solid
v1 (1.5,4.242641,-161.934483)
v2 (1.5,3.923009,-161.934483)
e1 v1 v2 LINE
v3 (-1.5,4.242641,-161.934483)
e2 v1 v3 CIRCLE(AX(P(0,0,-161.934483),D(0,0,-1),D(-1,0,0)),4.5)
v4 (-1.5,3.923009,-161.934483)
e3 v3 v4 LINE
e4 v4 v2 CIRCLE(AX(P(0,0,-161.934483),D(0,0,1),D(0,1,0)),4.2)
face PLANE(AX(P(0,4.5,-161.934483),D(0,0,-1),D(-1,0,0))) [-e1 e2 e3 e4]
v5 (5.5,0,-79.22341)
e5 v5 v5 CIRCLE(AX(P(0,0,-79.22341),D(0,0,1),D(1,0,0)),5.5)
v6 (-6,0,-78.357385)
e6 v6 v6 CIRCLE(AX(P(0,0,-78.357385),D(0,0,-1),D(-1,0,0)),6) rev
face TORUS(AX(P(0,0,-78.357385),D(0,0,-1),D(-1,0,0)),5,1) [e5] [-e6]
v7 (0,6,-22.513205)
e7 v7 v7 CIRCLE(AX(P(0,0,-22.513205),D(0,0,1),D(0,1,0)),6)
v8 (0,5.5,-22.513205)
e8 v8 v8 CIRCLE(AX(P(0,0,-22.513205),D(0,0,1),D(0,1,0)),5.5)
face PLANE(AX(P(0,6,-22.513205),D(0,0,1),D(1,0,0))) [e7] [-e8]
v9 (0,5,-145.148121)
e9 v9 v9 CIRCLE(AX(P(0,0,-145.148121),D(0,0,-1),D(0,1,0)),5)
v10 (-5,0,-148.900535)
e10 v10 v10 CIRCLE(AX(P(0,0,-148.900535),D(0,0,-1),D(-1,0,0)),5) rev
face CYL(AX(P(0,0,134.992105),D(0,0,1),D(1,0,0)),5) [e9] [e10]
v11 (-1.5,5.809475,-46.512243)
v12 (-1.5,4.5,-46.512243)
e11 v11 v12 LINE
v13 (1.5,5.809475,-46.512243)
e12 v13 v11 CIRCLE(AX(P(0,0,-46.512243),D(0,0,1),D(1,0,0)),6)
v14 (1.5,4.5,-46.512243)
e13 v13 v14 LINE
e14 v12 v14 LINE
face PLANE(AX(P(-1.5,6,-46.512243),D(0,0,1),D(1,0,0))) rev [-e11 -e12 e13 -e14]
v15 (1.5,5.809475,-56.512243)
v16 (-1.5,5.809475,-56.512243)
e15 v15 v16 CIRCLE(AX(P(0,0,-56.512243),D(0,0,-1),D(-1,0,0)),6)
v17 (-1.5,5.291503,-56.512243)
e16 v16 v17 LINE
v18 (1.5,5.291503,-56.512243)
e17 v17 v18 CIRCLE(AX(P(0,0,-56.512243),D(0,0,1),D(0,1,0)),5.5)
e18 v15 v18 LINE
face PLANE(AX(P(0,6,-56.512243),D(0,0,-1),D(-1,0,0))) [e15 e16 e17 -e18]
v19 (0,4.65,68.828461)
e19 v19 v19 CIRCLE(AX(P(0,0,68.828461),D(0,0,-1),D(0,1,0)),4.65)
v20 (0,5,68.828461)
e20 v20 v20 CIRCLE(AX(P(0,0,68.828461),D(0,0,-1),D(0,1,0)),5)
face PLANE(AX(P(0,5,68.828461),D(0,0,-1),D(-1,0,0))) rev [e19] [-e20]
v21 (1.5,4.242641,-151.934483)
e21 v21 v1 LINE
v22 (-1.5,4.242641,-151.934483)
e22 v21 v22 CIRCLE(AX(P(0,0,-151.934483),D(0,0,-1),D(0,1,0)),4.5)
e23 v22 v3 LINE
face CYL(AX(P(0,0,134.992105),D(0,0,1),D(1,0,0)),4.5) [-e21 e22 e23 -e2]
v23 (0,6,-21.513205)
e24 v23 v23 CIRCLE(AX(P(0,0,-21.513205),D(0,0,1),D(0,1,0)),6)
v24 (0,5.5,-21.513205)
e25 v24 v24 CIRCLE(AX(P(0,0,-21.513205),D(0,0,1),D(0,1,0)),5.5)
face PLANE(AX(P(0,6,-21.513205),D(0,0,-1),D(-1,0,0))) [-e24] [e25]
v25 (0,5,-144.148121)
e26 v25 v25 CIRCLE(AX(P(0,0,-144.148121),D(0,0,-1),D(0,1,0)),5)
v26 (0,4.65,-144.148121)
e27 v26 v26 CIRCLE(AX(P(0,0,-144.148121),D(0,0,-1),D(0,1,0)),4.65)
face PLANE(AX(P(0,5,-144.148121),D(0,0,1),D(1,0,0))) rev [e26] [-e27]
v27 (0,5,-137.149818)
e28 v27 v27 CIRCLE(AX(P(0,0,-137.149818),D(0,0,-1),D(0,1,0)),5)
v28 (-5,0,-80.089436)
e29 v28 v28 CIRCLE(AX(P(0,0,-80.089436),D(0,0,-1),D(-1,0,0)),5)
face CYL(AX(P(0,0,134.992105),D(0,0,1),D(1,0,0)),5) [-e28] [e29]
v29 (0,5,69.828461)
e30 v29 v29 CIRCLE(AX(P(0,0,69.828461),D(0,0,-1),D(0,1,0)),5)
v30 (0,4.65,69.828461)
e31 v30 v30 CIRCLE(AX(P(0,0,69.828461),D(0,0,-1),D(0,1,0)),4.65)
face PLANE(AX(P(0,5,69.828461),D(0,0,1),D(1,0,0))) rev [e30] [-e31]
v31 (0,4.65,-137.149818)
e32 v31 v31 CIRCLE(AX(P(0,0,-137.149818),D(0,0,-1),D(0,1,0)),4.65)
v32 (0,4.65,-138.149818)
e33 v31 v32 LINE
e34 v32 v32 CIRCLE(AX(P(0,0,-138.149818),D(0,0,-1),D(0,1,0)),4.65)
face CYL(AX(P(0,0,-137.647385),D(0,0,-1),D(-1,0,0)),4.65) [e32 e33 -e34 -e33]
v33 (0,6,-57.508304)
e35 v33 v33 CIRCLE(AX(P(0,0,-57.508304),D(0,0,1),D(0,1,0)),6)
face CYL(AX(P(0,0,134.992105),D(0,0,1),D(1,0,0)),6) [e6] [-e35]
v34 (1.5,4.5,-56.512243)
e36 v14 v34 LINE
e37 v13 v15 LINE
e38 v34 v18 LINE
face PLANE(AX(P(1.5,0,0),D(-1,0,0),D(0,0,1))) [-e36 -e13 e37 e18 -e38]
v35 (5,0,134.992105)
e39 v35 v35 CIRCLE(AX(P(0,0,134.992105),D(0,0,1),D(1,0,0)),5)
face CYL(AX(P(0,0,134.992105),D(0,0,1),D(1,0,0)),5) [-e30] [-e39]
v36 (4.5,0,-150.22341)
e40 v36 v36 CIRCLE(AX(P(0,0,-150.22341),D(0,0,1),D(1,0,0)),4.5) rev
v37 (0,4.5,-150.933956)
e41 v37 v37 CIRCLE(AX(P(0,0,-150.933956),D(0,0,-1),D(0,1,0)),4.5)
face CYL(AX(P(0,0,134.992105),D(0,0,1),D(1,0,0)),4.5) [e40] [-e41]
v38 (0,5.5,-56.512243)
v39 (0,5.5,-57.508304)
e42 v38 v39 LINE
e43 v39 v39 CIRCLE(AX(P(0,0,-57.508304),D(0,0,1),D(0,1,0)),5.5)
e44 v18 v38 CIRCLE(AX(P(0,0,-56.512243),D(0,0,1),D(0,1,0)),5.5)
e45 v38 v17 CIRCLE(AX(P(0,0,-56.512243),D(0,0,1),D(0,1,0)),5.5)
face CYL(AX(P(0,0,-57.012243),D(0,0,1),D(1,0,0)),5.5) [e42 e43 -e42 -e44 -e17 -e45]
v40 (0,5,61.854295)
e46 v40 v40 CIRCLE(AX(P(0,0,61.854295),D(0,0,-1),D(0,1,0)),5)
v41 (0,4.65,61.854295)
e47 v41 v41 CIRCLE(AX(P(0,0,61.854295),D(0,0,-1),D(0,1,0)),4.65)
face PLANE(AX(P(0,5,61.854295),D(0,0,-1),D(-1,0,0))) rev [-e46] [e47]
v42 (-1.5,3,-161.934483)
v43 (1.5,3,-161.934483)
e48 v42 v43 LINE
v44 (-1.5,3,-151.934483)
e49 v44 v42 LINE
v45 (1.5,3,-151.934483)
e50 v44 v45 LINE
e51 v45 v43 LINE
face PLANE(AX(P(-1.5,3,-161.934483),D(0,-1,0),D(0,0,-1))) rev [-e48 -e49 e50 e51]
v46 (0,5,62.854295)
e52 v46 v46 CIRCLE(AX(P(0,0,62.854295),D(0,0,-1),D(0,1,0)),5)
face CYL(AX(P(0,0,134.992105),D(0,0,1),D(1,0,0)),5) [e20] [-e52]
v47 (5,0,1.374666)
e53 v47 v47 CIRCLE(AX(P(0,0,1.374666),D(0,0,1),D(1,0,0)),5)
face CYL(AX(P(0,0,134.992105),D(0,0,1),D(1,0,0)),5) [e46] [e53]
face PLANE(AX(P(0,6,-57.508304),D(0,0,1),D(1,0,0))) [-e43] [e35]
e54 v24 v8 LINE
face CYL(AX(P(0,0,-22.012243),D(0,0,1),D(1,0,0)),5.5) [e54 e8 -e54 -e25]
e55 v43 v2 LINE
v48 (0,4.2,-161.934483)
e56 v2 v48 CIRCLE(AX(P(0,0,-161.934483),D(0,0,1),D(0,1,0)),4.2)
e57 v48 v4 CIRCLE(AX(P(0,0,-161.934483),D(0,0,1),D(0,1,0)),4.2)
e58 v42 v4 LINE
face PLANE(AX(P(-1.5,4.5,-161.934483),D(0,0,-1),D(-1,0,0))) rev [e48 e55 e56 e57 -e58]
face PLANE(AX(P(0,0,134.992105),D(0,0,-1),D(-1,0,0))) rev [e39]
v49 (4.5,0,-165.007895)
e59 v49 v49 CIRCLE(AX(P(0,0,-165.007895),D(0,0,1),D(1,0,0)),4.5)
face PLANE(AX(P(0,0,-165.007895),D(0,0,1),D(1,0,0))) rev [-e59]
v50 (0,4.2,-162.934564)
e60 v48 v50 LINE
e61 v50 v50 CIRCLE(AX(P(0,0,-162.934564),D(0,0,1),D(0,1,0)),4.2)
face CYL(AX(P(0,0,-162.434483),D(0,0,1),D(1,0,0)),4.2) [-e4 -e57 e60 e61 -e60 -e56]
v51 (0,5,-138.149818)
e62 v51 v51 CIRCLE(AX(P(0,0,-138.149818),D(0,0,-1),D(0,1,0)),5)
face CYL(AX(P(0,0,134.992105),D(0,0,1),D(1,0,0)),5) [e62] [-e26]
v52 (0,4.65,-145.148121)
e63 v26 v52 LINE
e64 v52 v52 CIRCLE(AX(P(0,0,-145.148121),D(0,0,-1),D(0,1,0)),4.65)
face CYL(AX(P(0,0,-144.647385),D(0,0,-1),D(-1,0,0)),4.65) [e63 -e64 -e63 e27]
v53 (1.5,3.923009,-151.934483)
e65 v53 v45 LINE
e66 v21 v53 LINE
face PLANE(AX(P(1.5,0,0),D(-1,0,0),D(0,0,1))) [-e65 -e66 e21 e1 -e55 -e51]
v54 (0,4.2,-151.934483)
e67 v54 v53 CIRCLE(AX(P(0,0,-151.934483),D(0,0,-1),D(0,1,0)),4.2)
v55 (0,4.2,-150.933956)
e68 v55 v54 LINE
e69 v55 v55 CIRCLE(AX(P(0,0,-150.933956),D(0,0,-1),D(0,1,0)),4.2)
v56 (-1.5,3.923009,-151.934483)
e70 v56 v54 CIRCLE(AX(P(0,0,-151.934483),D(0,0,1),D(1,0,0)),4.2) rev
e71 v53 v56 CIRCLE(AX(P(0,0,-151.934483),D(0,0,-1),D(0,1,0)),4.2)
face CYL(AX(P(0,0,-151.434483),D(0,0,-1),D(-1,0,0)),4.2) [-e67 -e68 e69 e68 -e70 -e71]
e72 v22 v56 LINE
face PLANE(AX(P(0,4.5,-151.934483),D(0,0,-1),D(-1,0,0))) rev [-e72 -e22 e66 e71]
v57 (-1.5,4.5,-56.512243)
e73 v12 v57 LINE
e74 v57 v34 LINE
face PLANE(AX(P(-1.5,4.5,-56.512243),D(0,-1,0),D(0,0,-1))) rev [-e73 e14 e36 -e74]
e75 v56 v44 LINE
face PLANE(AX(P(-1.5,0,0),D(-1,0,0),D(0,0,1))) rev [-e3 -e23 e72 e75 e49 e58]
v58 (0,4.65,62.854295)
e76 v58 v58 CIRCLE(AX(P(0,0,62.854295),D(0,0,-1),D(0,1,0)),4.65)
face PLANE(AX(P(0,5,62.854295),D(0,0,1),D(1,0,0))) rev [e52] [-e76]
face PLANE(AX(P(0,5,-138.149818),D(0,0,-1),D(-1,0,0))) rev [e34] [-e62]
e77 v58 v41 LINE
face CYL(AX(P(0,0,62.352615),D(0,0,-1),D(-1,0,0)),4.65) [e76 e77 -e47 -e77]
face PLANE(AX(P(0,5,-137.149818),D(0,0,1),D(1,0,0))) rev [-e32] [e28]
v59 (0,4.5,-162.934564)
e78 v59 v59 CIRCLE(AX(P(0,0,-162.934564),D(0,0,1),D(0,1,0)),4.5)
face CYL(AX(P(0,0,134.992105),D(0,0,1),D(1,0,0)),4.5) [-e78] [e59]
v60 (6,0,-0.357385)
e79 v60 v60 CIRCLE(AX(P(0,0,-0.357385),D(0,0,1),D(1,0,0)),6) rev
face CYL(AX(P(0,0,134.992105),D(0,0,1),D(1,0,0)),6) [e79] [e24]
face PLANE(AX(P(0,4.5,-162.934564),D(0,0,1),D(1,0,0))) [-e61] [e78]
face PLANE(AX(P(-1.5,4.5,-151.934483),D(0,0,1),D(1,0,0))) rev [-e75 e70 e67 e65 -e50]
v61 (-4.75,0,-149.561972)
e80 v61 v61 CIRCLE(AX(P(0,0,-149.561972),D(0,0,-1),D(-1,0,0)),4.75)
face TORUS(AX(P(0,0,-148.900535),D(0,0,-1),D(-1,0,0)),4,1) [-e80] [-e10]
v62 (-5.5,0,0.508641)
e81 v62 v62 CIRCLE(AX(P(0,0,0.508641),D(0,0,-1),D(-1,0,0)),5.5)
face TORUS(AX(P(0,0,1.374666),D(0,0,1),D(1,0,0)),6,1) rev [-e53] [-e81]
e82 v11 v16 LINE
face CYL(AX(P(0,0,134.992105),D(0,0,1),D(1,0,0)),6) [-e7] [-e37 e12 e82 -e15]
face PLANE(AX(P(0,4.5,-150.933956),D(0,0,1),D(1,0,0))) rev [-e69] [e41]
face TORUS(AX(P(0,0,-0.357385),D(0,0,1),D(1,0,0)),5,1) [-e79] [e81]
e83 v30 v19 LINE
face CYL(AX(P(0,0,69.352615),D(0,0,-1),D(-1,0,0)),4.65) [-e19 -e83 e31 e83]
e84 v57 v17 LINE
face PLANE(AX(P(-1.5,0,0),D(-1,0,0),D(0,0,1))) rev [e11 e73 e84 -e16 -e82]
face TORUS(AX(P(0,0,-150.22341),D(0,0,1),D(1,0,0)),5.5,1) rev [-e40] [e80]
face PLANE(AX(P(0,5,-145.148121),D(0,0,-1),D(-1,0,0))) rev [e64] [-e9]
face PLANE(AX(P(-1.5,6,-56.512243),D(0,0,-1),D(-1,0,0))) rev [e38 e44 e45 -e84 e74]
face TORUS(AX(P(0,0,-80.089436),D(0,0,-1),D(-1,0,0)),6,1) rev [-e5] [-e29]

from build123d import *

# Parameters (mm, degrees)
SKETCH7_W           = 10
SKETCH7_H           = 1.5
CUT_EXTRUDE4_DEPTH  = 1.5
SKETCH8_W           = 10
SKETCH8_H           = 1.5
CUT_EXTRUDE5_DEPTH  = 1.5
SKETCH11_W          = 1
SKETCH11_H          = 0.35
SKETCH12_W          = 1
SKETCH12_H          = 0.35
SKETCH14_R          = 6
BOSS_EXTRUDE1_DEPTH = 20
BOSS_EXTRUDE2_START = 20
SKETCH15_R          = 6
BOSS_EXTRUDE2_DEPTH = 20
SKETCH18_W          = 1
SKETCH18_H          = 0.35
SKETCH19_W          = 1
SKETCH19_H          = 0.35
SKETCH22_W          = 0.996061345
SKETCH22_H          = 0.5
SKETCH26_W          = 1.000081644
SKETCH26_H          = 0.3
SKETCH27_W          = 1.000526486
SKETCH27_H          = 0.3
SKETCH29_W          = 1
SKETCH29_H          = 0.5
FILLET2_R           = 1
FILLET3_R           = 1
FILLET4_R           = 1
FILLET5_R           = 1
FILLET6_R           = 1
FILLET7_R           = 1


# Some blends are built 0.0001 mm under size
with BuildPart() as part:
    # Sketch1 → Revolve1 (revolve)
    with BuildSketch(Plane(origin=(0, 0, 0), x_dir=(0, 0, -1), z_dir=(1, 0, 0)), mode=Mode.PRIVATE) as revolve1_sk:
        Polygon((-134.992104591, 0), (165.007895409, 0), (165.007895409, 4.5), (149.357384883, 4.5), (149.357384883, 5), (59.357384883, 5), (59.357384883, 6), (19.357384883, 6), (19.357384883, 5), (-134.992104591, 5), align=None)
    revolve(revolve1_sk.sketch.rotate(Axis((0, 0, 134.992104591), (0, 0, -1)), 90), axis=Axis((0, 0, 134.992104591), (0, 0, -1)))

    # Sketch7 → Cut-Extrude4 (cut, symmetric)
    with BuildSketch(Plane(origin=(0, 0, 0), x_dir=(0, 0, -1), z_dir=(1, 0, 0))):
        with Locations((51.512242661, 5.25)):
            Rectangle(SKETCH7_W, SKETCH7_H)
    extrude(amount=CUT_EXTRUDE4_DEPTH, both=True, mode=Mode.SUBTRACT)

    # Sketch8 → Cut-Extrude5 (cut, symmetric)
    with BuildSketch(Plane(origin=(0, 0, 0), x_dir=(0, 0, -1), z_dir=(1, 0, 0))):
        with Locations((156.934482796, 3.75)):
            Rectangle(SKETCH8_W, SKETCH8_H)
    extrude(amount=CUT_EXTRUDE5_DEPTH, both=True, mode=Mode.SUBTRACT)

    # Cut-Sweep1: sweep along a path in Sketch10
    with BuildLine(Plane(origin=(0, 0, -137.647384883), x_dir=(-1, 0, 0), z_dir=(0, 0, -1))) as cut_sweep1_path:
        CenterArc((0, 0), 5, 0, 360)
    # Sketch11 → Cut-Sweep1 (sweep, cut)
    with BuildSketch(Plane(origin=(0, 0, 0), x_dir=(0, 0, -1), z_dir=(1, 0, 0))):
        with Locations((137.649818054, 4.825)):
            Rectangle(SKETCH11_W, SKETCH11_H)
    sweep(path=cut_sweep1_path.line, mode=Mode.SUBTRACT)

    # Cut-Sweep2: sweep along a path in Sketch9
    with BuildLine(Plane(origin=(0, 0, -144.647384883), x_dir=(-1, 0, 0), z_dir=(0, 0, -1))) as cut_sweep2_path:
        CenterArc((0, 0), 5, 0, 360)
    # Sketch12 → Cut-Sweep2 (sweep, cut)
    with BuildSketch(Plane(origin=(0, 0, 0), x_dir=(0, 0, -1), z_dir=(1, 0, 0))):
        with Locations((144.648120844, 4.825)):
            Rectangle(SKETCH12_W, SKETCH12_H)
    sweep(path=cut_sweep2_path.line, mode=Mode.SUBTRACT)

    # Sketch14 → Boss-Extrude1 (add)
    with BuildSketch(Plane(origin=(0, 0, -59.357384883), x_dir=(-1, 0, 0), z_dir=(0, 0, -1))):
        with Locations(Location((0, 0, 0), (0, 0, 180))):
            Circle(SKETCH14_R)
    extrude(amount=BOSS_EXTRUDE1_DEPTH)

    # Sketch15 → Boss-Extrude2 (add)
    with BuildSketch(Plane.XY.offset(-19.357384883).offset(BOSS_EXTRUDE2_START)):
        Circle(SKETCH15_R)
    extrude(amount=-BOSS_EXTRUDE2_DEPTH)

    # Cut-Sweep3: sweep along a path in Sketch16
    with BuildLine(Plane(origin=(0, 0, 62.352615117), x_dir=(-1, 0, 0), z_dir=(0, 0, -1))) as cut_sweep3_path:
        CenterArc((0, 0), 5, 0, 360)
    # Sketch18 → Cut-Sweep3 (sweep, cut)
    with BuildSketch(Plane(origin=(0, 0, 0), x_dir=(0, 0, -1), z_dir=(1, 0, 0))):
        with Locations((-62.354294527, 4.825)):
            Rectangle(SKETCH18_W, SKETCH18_H)
    sweep(path=cut_sweep3_path.line, mode=Mode.SUBTRACT)

    # Cut-Sweep4: sweep along a path in Sketch17
    with BuildLine(Plane(origin=(0, 0, 69.352615117), x_dir=(-1, 0, 0), z_dir=(0, 0, -1))) as cut_sweep4_path:
        CenterArc((0, 0), 5, 0, 360)
    # Sketch19 → Cut-Sweep4 (sweep, cut)
    with BuildSketch(Plane(origin=(0, 0, 0), x_dir=(0, 0, -1), z_dir=(1, 0, 0))):
        with Locations((-69.328460844, 4.825)):
            Rectangle(SKETCH19_W, SKETCH19_H)
    sweep(path=cut_sweep4_path.line, mode=Mode.SUBTRACT)

    # Cut-Sweep5: sweep along a path in Sketch20
    with BuildLine(Plane.XY.offset(-57.012242661)) as cut_sweep5_path:
        CenterArc((0, 0), 6, 0, 360)
    # Sketch22 → Cut-Sweep5 (sweep, cut)
    with BuildSketch(Plane(origin=(0, 0, 0), x_dir=(0, 0, -1), z_dir=(1, 0, 0))):
        with Locations((57.010273334, 5.75)):
            Rectangle(SKETCH22_W, SKETCH22_H)
    sweep(path=cut_sweep5_path.line, mode=Mode.SUBTRACT)

    # Cut-Sweep7: sweep along a path in Sketch24
    with BuildLine(Plane.XY.offset(-162.434482796)) as cut_sweep7_path:
        CenterArc((0, 0), 4.5, 0, 360)
    # Sketch26 → Cut-Sweep7 (sweep, cut)
    with BuildSketch(Plane(origin=(0, 0, 0), x_dir=(0, 0, -1), z_dir=(1, 0, 0))):
        with Locations((162.434523618, 4.35)):
            Rectangle(SKETCH26_W, SKETCH26_H)
    sweep(path=cut_sweep7_path.line, mode=Mode.SUBTRACT)

    # Cut-Sweep8: sweep along a path in Sketch25
    with BuildLine(Plane(origin=(0, 0, -151.434482796), x_dir=(-1, 0, 0), z_dir=(0, 0, -1))) as cut_sweep8_path:
        CenterArc((0, 0), 4.5, 0, 360)
    # Sketch27 → Cut-Sweep8 (sweep, cut)
    with BuildSketch(Plane(origin=(0, 0, 0), x_dir=(0, 0, -1), z_dir=(1, 0, 0))):
        with Locations((151.434219553, 4.35)):
            Rectangle(SKETCH27_W, SKETCH27_H)
    sweep(path=cut_sweep8_path.line, mode=Mode.SUBTRACT)

    # Cut-Sweep9: sweep along a path in Sketch28
    with BuildLine(Plane.XY.offset(-22.012242661)) as cut_sweep9_path:
        CenterArc((0, 0), 6, 0, 360)
    # Sketch29 → Cut-Sweep9 (sweep, cut)
    with BuildSketch(Plane(origin=(0, 0, 0), x_dir=(0, 0, -1), z_dir=(1, 0, 0))):
        with Locations((22.013204975, 5.75)):
            Rectangle(SKETCH29_W, SKETCH29_H)
    sweep(path=cut_sweep9_path.line, mode=Mode.SUBTRACT)

    # Fillet2
    # the kernel refuses this fillet: 1 mm, written as the material it adds along each edge
    with BuildSketch(Plane(origin=(0, 0, -149.357384883), x_dir=(1, 0, 0), z_dir=(0, 1, 0))) as fillet2_piece_1:
        with BuildLine():
            CenterArc((5.5, 0.866025404), FILLET2_R, 180, 60)
            Line((5, 0), (4.99, -0.017320508))
            ThreePointArc((4.99, -0.017320508), (4.75, -0.02), (4.5, -0.02))
            Line((4.5, -0.02), (4.48, 0))
            Line((4.48, 0), (4.48, 0.866025404))
            Line((4.48, 0.866025404), (4.5, 0.866025404))
        make_face()
    revolve(axis=Axis((0, 0, -149.357384883), (0, 0, -1)))

    # Fillet3
    fillet3_edges = [part.edges().sort_by_distance(p)[0] for p in [
        (-5, 0, -149.357384883),
    ]]
    fillet(fillet3_edges, radius=FILLET3_R)

    # Fillet4
    fillet4_edges = [part.edges().sort_by_distance(p)[0] for p in [
        (-6, 0, -79.357384883),
    ]]
    fillet(fillet4_edges, radius=FILLET4_R - 0.0001)  # a hair under: the kernel refuses the full size

    # Fillet5
    fillet5_edges = [part.edges().sort_by_distance(p)[0] for p in [
        (-5, 0, -79.357384883),
    ]]
    fillet(fillet5_edges, radius=FILLET5_R)

    # Fillet6
    fillet6_edges = [part.edges().sort_by_distance(p)[0] for p in [
        (-6, 0, 0.642615117),
    ]]
    fillet(fillet6_edges, radius=FILLET6_R - 0.0001)  # a hair under: the kernel refuses the full size

    # Fillet7
    fillet7_edges = [part.edges().sort_by_distance(p)[0] for p in [
        (-5, 0, 0.642615117),
    ]]
    fillet(fillet7_edges, radius=FILLET7_R)


solid = part.part
